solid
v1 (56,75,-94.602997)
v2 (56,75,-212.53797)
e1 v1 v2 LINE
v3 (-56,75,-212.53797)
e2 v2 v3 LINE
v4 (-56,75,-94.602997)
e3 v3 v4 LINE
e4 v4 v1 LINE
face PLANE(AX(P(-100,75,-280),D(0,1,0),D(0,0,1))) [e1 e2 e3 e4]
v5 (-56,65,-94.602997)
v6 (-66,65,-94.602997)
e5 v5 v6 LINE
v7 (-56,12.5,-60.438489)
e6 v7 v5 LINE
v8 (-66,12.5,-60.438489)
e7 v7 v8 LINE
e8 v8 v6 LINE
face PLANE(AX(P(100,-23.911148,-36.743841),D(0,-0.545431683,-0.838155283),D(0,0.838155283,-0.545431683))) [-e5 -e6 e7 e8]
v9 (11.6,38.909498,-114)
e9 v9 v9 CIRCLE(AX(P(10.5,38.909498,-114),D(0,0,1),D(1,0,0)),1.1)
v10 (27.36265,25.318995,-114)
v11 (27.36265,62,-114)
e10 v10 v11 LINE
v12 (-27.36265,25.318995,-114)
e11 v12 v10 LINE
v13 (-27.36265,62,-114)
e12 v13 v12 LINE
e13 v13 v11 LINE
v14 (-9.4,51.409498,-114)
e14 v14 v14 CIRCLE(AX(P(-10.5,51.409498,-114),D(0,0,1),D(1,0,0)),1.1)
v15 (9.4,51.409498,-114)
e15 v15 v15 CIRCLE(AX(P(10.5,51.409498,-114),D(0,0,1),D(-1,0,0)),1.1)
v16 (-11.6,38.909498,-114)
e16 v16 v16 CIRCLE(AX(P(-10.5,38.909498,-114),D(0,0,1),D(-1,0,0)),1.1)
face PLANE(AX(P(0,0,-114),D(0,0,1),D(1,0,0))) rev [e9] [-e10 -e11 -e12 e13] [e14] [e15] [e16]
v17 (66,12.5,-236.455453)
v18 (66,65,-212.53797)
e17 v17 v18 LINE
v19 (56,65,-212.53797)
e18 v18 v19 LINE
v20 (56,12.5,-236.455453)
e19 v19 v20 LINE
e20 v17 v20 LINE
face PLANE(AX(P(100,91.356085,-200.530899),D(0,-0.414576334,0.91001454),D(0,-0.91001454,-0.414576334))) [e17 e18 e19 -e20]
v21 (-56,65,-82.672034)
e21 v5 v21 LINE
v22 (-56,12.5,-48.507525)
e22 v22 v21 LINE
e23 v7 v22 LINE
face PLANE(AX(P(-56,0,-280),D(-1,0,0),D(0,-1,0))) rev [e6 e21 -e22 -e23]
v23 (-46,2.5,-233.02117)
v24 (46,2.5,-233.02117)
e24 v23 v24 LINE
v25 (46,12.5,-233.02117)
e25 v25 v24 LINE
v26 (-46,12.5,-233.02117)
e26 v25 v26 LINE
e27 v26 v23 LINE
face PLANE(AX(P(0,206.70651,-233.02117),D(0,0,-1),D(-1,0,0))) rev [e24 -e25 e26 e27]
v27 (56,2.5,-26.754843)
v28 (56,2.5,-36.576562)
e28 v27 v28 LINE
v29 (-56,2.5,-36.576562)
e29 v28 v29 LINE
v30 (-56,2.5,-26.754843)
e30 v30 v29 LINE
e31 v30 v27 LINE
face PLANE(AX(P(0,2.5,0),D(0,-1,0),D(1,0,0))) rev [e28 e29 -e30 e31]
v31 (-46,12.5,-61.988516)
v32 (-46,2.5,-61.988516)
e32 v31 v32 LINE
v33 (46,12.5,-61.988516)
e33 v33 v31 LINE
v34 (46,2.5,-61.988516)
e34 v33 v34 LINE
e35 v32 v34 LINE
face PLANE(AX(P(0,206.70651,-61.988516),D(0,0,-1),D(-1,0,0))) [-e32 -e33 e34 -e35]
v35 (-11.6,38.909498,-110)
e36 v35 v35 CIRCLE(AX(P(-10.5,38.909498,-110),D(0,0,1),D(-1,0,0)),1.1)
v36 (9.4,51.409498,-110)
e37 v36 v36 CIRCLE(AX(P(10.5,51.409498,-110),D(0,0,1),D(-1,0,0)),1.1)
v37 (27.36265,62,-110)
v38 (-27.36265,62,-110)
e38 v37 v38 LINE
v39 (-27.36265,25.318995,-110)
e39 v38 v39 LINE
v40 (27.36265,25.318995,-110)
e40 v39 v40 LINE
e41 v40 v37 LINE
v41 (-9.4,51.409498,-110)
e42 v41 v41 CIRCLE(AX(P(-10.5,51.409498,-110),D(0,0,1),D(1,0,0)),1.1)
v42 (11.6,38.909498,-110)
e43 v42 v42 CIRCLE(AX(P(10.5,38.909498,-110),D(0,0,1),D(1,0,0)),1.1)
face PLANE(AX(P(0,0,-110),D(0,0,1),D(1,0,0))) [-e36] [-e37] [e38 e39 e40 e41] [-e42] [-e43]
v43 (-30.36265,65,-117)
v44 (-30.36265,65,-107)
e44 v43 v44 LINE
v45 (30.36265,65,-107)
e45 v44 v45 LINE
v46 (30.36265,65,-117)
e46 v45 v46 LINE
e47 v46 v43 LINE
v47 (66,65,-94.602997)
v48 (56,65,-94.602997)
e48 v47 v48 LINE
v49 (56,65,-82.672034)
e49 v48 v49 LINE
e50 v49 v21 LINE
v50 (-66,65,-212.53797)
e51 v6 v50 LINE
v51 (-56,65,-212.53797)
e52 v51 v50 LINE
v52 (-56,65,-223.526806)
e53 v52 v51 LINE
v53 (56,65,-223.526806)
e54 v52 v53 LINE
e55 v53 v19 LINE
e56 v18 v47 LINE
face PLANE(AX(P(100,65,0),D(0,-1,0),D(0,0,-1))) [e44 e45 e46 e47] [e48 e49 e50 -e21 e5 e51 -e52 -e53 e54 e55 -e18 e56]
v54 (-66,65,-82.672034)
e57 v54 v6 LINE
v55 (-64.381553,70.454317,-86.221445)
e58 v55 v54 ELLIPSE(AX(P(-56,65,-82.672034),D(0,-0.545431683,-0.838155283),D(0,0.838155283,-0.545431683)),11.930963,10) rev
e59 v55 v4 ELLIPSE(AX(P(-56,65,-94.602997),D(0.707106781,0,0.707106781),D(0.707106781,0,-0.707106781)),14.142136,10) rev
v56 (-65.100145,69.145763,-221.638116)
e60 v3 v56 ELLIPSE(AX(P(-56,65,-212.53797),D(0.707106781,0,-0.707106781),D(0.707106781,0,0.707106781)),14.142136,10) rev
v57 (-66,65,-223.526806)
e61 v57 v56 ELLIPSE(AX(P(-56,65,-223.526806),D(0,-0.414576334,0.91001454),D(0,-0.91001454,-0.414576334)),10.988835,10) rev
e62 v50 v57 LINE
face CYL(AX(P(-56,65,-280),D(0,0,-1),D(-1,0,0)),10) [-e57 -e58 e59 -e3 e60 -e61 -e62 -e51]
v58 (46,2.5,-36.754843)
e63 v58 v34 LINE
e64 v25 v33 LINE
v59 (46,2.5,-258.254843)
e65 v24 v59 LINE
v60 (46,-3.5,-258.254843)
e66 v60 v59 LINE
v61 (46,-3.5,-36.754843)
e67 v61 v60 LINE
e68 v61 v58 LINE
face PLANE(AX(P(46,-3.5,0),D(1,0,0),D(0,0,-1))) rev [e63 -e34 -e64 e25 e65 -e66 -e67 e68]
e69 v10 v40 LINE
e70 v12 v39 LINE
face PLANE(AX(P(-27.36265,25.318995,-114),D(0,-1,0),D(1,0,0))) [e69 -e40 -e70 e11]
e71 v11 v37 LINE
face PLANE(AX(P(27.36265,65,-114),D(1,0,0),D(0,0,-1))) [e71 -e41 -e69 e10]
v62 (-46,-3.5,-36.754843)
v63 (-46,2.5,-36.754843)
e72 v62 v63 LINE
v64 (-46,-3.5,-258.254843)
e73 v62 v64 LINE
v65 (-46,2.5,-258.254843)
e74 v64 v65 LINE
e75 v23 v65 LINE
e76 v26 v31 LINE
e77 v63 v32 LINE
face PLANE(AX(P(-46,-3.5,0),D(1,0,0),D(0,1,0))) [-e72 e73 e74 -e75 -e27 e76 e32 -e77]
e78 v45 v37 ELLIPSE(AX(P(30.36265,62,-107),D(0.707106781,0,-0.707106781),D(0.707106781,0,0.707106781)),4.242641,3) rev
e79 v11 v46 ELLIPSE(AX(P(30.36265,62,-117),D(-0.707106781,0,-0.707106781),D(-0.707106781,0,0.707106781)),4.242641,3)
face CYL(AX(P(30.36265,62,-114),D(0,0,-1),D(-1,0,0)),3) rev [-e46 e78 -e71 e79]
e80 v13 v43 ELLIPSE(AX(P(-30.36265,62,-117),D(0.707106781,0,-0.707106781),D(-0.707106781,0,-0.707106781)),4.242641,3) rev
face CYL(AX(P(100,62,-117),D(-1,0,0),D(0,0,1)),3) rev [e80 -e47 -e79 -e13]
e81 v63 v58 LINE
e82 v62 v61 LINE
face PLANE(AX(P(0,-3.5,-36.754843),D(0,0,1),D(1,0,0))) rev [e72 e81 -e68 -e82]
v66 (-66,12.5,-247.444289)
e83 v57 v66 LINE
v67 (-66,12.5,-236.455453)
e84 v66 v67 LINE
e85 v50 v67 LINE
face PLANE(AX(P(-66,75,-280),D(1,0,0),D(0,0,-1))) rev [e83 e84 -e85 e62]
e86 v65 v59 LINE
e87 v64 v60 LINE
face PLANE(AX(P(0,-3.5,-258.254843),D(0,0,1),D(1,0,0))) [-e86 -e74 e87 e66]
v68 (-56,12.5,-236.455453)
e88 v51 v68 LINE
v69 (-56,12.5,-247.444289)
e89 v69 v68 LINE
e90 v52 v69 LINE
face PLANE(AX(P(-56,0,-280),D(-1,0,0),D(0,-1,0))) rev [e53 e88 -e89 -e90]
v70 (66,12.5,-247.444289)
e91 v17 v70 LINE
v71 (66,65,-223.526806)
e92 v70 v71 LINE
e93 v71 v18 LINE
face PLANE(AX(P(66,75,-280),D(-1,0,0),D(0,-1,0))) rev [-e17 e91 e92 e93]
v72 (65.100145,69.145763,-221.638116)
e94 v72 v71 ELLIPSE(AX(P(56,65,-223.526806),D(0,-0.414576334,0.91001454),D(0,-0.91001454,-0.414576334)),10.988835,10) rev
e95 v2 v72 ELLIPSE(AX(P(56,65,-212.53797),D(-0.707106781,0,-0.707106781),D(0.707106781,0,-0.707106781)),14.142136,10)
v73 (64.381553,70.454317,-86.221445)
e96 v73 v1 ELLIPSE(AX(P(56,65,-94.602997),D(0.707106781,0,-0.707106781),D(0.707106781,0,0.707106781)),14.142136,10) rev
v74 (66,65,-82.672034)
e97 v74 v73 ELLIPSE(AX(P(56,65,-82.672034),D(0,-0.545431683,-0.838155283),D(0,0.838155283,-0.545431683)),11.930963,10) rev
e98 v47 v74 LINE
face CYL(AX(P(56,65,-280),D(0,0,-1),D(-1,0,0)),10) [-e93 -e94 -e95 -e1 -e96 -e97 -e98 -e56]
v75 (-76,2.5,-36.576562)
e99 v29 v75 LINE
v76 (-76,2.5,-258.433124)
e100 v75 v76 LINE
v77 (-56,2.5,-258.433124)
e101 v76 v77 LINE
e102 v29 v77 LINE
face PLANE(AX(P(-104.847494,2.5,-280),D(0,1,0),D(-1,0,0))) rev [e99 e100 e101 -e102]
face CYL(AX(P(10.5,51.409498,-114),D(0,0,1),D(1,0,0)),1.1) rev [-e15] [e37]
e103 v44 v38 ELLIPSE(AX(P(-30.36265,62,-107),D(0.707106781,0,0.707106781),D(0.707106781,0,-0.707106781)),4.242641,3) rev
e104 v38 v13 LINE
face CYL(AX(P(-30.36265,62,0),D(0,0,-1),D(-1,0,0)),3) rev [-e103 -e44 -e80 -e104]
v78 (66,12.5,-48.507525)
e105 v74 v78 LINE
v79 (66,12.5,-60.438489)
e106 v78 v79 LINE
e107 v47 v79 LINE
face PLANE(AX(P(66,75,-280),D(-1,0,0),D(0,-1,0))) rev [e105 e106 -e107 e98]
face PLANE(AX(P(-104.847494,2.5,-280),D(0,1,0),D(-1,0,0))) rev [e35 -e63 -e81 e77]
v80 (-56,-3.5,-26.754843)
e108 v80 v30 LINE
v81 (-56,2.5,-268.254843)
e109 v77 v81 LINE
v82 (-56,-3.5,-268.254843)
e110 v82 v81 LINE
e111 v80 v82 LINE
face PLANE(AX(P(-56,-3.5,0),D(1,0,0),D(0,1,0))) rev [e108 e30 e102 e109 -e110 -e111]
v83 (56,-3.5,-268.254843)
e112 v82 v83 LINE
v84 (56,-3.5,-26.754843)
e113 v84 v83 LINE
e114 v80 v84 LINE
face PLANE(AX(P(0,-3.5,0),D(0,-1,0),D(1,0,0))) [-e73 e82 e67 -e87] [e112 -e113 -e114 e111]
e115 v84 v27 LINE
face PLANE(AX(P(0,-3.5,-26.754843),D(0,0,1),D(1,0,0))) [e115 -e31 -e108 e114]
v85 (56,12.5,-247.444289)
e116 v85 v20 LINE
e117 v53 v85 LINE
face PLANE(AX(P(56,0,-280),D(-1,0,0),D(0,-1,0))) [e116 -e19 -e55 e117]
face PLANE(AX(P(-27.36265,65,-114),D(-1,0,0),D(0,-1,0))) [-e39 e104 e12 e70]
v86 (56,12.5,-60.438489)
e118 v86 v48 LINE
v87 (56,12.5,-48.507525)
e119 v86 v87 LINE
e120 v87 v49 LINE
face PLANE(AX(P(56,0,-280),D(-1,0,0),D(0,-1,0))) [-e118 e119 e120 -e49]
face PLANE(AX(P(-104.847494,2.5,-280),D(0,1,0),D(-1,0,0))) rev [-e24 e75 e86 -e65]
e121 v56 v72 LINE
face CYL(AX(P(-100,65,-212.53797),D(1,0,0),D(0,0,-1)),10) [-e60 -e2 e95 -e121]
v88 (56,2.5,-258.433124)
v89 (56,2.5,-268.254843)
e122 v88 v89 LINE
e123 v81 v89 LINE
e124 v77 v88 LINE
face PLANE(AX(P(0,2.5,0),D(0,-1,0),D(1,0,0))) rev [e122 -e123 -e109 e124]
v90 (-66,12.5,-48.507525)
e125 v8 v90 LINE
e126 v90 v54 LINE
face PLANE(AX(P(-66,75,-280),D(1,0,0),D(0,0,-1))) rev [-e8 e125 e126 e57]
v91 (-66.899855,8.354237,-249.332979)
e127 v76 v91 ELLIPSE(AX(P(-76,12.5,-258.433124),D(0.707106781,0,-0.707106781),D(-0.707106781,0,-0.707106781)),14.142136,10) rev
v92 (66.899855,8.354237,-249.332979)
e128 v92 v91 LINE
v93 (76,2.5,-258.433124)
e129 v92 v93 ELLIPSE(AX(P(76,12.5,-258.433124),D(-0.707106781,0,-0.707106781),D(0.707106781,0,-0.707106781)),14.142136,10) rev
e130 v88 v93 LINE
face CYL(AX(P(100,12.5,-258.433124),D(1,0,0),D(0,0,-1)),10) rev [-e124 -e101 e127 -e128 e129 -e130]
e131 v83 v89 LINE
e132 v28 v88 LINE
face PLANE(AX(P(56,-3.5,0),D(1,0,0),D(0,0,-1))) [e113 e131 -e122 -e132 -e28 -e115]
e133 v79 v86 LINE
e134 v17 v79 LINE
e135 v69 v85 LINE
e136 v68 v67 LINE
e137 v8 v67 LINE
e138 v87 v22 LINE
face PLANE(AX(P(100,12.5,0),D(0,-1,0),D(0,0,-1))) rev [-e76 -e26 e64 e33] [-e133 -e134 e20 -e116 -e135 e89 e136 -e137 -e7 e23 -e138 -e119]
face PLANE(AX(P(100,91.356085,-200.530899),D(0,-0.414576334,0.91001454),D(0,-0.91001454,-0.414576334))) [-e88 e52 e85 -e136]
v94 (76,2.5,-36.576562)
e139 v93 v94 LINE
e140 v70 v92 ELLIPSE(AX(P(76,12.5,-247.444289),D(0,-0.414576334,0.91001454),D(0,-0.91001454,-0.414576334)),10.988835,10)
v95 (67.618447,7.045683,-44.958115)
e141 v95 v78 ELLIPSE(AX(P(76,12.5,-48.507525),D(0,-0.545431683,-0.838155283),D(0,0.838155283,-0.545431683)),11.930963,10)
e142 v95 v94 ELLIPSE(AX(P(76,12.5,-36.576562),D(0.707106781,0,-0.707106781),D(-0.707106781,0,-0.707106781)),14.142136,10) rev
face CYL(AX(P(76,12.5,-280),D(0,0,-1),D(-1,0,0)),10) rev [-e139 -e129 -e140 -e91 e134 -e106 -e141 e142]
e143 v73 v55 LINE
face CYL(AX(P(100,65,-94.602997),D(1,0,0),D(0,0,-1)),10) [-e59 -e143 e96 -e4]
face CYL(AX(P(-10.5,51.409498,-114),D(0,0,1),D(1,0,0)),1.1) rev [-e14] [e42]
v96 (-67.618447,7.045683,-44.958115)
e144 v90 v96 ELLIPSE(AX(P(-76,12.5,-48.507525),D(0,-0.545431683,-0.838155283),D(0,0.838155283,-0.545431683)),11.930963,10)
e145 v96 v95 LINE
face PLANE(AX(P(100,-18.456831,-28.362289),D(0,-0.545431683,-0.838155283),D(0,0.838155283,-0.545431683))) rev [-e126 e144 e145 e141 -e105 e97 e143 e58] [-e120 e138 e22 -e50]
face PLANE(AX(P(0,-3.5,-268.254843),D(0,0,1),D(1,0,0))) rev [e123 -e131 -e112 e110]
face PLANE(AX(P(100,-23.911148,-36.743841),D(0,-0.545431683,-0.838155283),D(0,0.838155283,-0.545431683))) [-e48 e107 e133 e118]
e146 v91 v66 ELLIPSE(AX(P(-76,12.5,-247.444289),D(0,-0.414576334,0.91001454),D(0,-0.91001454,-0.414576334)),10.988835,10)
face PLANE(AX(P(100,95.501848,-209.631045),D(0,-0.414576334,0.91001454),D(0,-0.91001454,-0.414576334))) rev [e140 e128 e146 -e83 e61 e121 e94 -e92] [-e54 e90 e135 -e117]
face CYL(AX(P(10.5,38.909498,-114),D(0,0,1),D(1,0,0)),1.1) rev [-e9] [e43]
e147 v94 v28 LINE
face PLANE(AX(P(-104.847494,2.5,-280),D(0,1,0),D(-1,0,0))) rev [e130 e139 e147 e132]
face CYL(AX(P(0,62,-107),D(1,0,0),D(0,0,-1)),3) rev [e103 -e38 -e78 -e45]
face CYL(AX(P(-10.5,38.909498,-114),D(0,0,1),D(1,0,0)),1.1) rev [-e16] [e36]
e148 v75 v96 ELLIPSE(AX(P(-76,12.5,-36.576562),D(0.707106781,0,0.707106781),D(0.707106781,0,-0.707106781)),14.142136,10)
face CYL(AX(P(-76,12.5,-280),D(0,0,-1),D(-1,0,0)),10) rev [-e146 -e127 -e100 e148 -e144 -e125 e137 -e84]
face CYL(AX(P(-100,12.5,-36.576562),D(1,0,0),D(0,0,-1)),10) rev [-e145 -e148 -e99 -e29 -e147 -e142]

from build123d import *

# Parameters (mm, degrees)
SKETCH1_W           = 200
SKETCH1_H           = 150
BOSS_EXTRUDE1_DEPTH = 280
SKETCH2_W           = 44
SKETCH2_H           = 60
SKETCH2_W_2         = 34
SKETCH2_H_2         = 72.5
CUT_EXTRUDE1_DEPTH  = 280
CUT_EXTRUDE5_DEPTH  = 200
CUT_EXTRUDE8_DEPTH  = 44
CUT_EXTRUDE9_DEPTH  = 44
SKETCH6_W           = 112
SKETCH6_H           = 52.5
CUT_EXTRUDE7_DEPTH  = 280
FILLET1_START       = -100
FILLET1_DEPTH       = 200
FILLET1_START_2     = -76
FILLET1_2_DEPTH     = 10
FILLET1_START_3     = 66
FILLET1_3_DEPTH     = 10
FILLET1_START_4     = -66
FILLET1_4_DEPTH     = 132
FILLET1_START_5     = -281
FILLET1_5_DEPTH     = 282
SKETCH8_W           = 211.062900289
SKETCH8_H           = 77.5
CUT_EXTRUDE10_DEPTH = 280
SKETCH10_W          = 112
SKETCH10_H          = 9.821718876
SKETCH10_H_2        = 221.856562249
SKETCH10_H_3        = 9.821718875
BOSS_EXTRUDE2_DEPTH = 6
SKETCH10_4_W        = 92
SKETCH10_4_H        = 171.032653569
CUT_EXTRUDE11_DEPTH = 10
BOSS_EXTRUDE3_START = -110
SKETCH11_W          = 54.725299756
SKETCH11_H          = 39.681004686
SKETCH11_R          = 1.1
BOSS_EXTRUDE3_DEPTH = 4
FILLET2_R           = 3


with BuildPart() as part:
    # Sketch1 → Boss-Extrude1 (new body)
    with BuildSketch(Plane.XY):
        Rectangle(SKETCH1_W, SKETCH1_H)
    extrude(amount=-BOSS_EXTRUDE1_DEPTH)

    # Sketch2 → Cut-Extrude1 (cut)
    with BuildSketch(Plane.XY):
        with Locations((78, -45)):
            Rectangle(SKETCH2_W, SKETCH2_H)
        with Locations((-78, -45)):
            Rectangle(SKETCH2_W, SKETCH2_H)
        with Locations((83, 38.75)):
            Rectangle(SKETCH2_W_2, SKETCH2_H_2)
        with Locations((-83, 38.75)):
            Rectangle(SKETCH2_W_2, SKETCH2_H_2)
    extrude(amount=-CUT_EXTRUDE1_DEPTH, mode=Mode.SUBTRACT)

    # Sketch3 → Cut-Extrude5 (cut)
    with BuildSketch(Plane.ZY.offset(100)):
        Polygon((-280, 2.5), (-274.399041425, 2.5), (-252, 2.5), (-218.971094498, 75), (-280, 75), align=None)
        Polygon((-236.455453487, 12.5), (-168.766953205, 12.5), (-60.438488841, 12.5), (-94.602997447, 65), (-144.84946991, 65), (-212.537970192, 65), align=None)
        Polygon((-89.179559504, 75), (-42, 2.5), (-5.600958575, 2.5), (0, 2.5), (0, 75), align=None)
    extrude(amount=-CUT_EXTRUDE5_DEPTH, mode=Mode.SUBTRACT)

    # Sketch5 → Cut-Extrude8 (cut)
    with BuildSketch(Plane.ZY.offset(100)):
        Polygon((-264.773291637, -7.125749789), (-270.374250211, -15), (-140, -15), (-140, -7.125749789), align=None)
        Polygon((-15.226708363, -7.125749789), (-140, -7.125749789), (-140, -15), (-9.625749789, -15), align=None)
    extrude(amount=-CUT_EXTRUDE8_DEPTH, mode=Mode.SUBTRACT)

    # Sketch7 → Cut-Extrude9 (cut)
    with BuildSketch(Plane(origin=(100, 0, 0), x_dir=(0, 0, -1), z_dir=(1, 0, 0))):
        Polygon((9.625749789, -15), (15.226708363, -7.125749789), (264.773291637, -7.125749789), (270.374250211, -15), align=None)
    extrude(amount=-CUT_EXTRUDE9_DEPTH, mode=Mode.SUBTRACT)

    # Sketch6 → Cut-Extrude7 (cut)
    with BuildSketch(Plane.XY):
        with Locations((0, 38.75)):
            Rectangle(SKETCH6_W, SKETCH6_H)
    extrude(amount=-CUT_EXTRUDE7_DEPTH, mode=Mode.SUBTRACT)

    # Fillet1: read off the stored shape, not the designer's step
    # Fillet1 outline → Fillet1 (cut)
    with BuildSketch(Plane.YZ.offset(FILLET1_START)):
        with BuildLine():
            Line((-75, 0), (-75, -10))
            ThreePointArc((-75, -10), (-72.071067812, -2.928932188), (-65, 0))
            Line((-65, 0), (-75, 0))
        make_face()
        with BuildLine():
            ThreePointArc((-65, -280), (-72.071067812, -277.071067812), (-75, -270))
            Line((-75, -270), (-75, -280))
            Line((-75, -280), (-65, -280))
        make_face()
        with BuildLine():
            Line((2.5, 0), (-7.5, 0))
            ThreePointArc((-7.5, 0), (-0.428932188, -2.928932188), (2.5, -10))
            Line((2.5, -10), (2.5, 0))
        make_face()
        with BuildLine():
            ThreePointArc((2.5, -270), (-0.428932188, -277.071067812), (-7.5, -280))
            Line((-7.5, -280), (2.5, -280))
            Line((2.5, -280), (2.5, -270))
        make_face()
        with BuildLine():
            Line((75, -89.179559504), (70.454316835, -86.221444616))
            ThreePointArc((70.454316835, -86.221444616), (73.790425711, -89.835564613), (75, -94.602997447))
            Line((75, -94.602997447), (75, -89.179559504))
        make_face()
        with BuildLine():
            ThreePointArc((75, -212.537970192), (73.410042611, -217.948255145), (69.145763344, -221.638115591))
            Line((69.145763344, -221.638115591), (75, -218.971094498))
            Line((75, -218.971094498), (75, -212.537970192))
        make_face()
    extrude(amount=FILLET1_DEPTH, mode=Mode.SUBTRACT)

    # Fillet1 2 outline → Fillet1 2 (add)
    with BuildSketch(Plane.YZ.offset(FILLET1_START_2)):
        with BuildLine():
            ThreePointArc((7.045683165, -44.958114888), (3.709574289, -41.343994891), (2.5, -36.576562057))
            Line((2.5, -36.576562057), (2.5, -258.433124306))
            ThreePointArc((2.5, -258.433124306), (4.089957389, -253.022839352), (8.354236656, -249.332978906))
            Line((8.354236656, -249.332978906), (69.145763344, -221.638115591))
            ThreePointArc((69.145763344, -221.638115591), (73.410042611, -217.948255145), (75, -212.537970192))
            Line((75, -212.537970192), (75, -94.602997447))
            ThreePointArc((75, -94.602997447), (73.790425711, -89.835564613), (70.454316835, -86.221444616))
            Line((70.454316835, -86.221444616), (7.045683165, -44.958114888))
        make_face()
    extrude(amount=FILLET1_2_DEPTH)

    # Fillet1 3 outline → Fillet1 3 (add)
    with BuildSketch(Plane.YZ.offset(FILLET1_START_3)):
        with BuildLine():
            ThreePointArc((7.045683165, -44.958114888), (3.709574289, -41.343994891), (2.5, -36.576562057))
            Line((2.5, -36.576562057), (2.5, -258.433124306))
            ThreePointArc((2.5, -258.433124306), (4.089957389, -253.022839352), (8.354236656, -249.332978906))
            Line((8.354236656, -249.332978906), (69.145763344, -221.638115591))
            ThreePointArc((69.145763344, -221.638115591), (73.410042611, -217.948255145), (75, -212.537970192))
            Line((75, -212.537970192), (75, -94.602997447))
            ThreePointArc((75, -94.602997447), (73.790425711, -89.835564613), (70.454316835, -86.221444616))
            Line((70.454316835, -86.221444616), (7.045683165, -44.958114888))
        make_face()
    extrude(amount=FILLET1_3_DEPTH)

    # Fillet1 4 outline → Fillet1 4 (add)
    with BuildSketch(Plane.YZ.offset(FILLET1_START_4)):
        with BuildLine():
            ThreePointArc((7.045683165, -44.958114888), (3.709574289, -41.343994891), (2.5, -36.576562057))
            Line((2.5, -36.576562057), (2.5, -42))
            Line((2.5, -42), (7.045683165, -44.958114888))
        make_face()
        with BuildLine():
            Line((2.5, -252), (2.5, -258.433124306))
            ThreePointArc((2.5, -258.433124306), (4.089957389, -253.022839352), (8.354236656, -249.332978906))
            Line((8.354236656, -249.332978906), (2.5, -252))
        make_face()
    extrude(amount=FILLET1_4_DEPTH)

    # Fillet1 5 outline → Fillet1 5 (cut)
    with BuildSketch(Plane.XY.offset(FILLET1_START_5)):
        with BuildLine():
            ThreePointArc((56, 75), (63.071067812, 72.071067812), (66, 65))
            Line((66, 65), (66, 12.5))
            ThreePointArc((66, 12.5), (68.928932188, 5.428932188), (76, 2.5))
            Line((76, 2.5), (76, 75))
            Line((76, 75), (56, 75))
        make_face()
        with BuildLine():
            ThreePointArc((-66, 65), (-63.071067812, 72.071067812), (-56, 75))
            Line((-56, 75), (-76, 75))
            Line((-76, 75), (-76, 2.5))
            ThreePointArc((-76, 2.5), (-68.928932188, 5.428932188), (-66, 12.5))
            Line((-66, 12.5), (-66, 65))
        make_face()
        with BuildLine():
            Line((100, 2.5), (90, 2.5))
            ThreePointArc((90, 2.5), (97.071067812, -0.428932188), (100, -7.5))
            Line((100, -7.5), (100, 2.5))
        make_face()
        with BuildLine():
            Line((-90, 2.5), (-100, 2.5))
            Line((-100, 2.5), (-100, -7.5))
            ThreePointArc((-100, -7.5), (-97.071067812, -0.428932188), (-90, 2.5))
        make_face()
        with BuildLine():
            Line((56, -75), (56, -65))
            ThreePointArc((56, -65), (53.071067812, -72.071067812), (46, -75))
            Line((46, -75), (56, -75))
        make_face()
        with BuildLine():
            ThreePointArc((-46, -75), (-53.071067812, -72.071067812), (-56, -65))
            Line((-56, -65), (-56, -75))
            Line((-56, -75), (-46, -75))
        make_face()
    extrude(amount=FILLET1_5_DEPTH, mode=Mode.SUBTRACT)

    # Sketch8 → Cut-Extrude10 (cut)
    with BuildSketch(Plane.XY):
        with Locations((0.683956476, -36.25)):
            Rectangle(SKETCH8_W, SKETCH8_H)
    extrude(amount=-CUT_EXTRUDE10_DEPTH, mode=Mode.SUBTRACT)

    # Sketch10 → Boss-Extrude2 (add)
    # profile 1 of 3: a face of its own
    with BuildSketch(Plane.XZ.offset(-2.5)):
        with Locations((0, -31.665702619)):
            Rectangle(SKETCH10_W, SKETCH10_H)
    # profile 2 of 3: a face of its own
    with BuildSketch(Plane.XZ.offset(-2.5)):
        with Locations((0, -147.504843182)):
            Rectangle(SKETCH10_W, SKETCH10_H_2)
        Polygon((-46, -61.988516397), (-46, -36.754843181), (46, -36.754843181), (46, -61.988516397), (46, -233.021169966), (46, -258.254843181), (-46, -258.254843181), (-46, -233.021169966), align=None, mode=Mode.SUBTRACT)
    # profile 3 of 3: a face of its own
    with BuildSketch(Plane.XZ.offset(-2.5)):
        with Locations((0, -263.343983744)):
            Rectangle(SKETCH10_W, SKETCH10_H_3)
    extrude(amount=BOSS_EXTRUDE2_DEPTH)

    # Sketch10<4> → Cut-Extrude11 (cut)
    with BuildSketch(Plane.XZ.offset(-2.5)):
        with Locations((0, -147.504843182)):
            Rectangle(SKETCH10_4_W, SKETCH10_4_H)
    extrude(amount=-CUT_EXTRUDE11_DEPTH, mode=Mode.SUBTRACT)

    # Sketch11 → Boss-Extrude3 (add)
    with BuildSketch(Plane.XY.offset(BOSS_EXTRUDE3_START)):
        with Locations((0, 45.159497657)):
            Rectangle(SKETCH11_W, SKETCH11_H)
        with Locations((-10.5, 51.409497657)):
            Circle(SKETCH11_R, mode=Mode.SUBTRACT)
        with Locations(Location((10.5, 51.409497657, 0), (0, 0, 180))):
            Circle(SKETCH11_R, mode=Mode.SUBTRACT)
        with Locations((10.5, 38.909497657)):
            Circle(SKETCH11_R, mode=Mode.SUBTRACT)
        with Locations(Location((-10.5, 38.909497657, 0), (0, 0, 180))):
            Circle(SKETCH11_R, mode=Mode.SUBTRACT)
    extrude(amount=-BOSS_EXTRUDE3_DEPTH)

    # Fillet2
    fillet2_edges = [part.edges().sort_by_distance(p)[0] for p in [
        (0, 65, -114),
        (-27.362649878, 65, -112),
        (27.362649878, 65, -112),
        (0, 65, -110),
    ]]
    fillet(fillet2_edges, radius=FILLET2_R)


solid = part.part
